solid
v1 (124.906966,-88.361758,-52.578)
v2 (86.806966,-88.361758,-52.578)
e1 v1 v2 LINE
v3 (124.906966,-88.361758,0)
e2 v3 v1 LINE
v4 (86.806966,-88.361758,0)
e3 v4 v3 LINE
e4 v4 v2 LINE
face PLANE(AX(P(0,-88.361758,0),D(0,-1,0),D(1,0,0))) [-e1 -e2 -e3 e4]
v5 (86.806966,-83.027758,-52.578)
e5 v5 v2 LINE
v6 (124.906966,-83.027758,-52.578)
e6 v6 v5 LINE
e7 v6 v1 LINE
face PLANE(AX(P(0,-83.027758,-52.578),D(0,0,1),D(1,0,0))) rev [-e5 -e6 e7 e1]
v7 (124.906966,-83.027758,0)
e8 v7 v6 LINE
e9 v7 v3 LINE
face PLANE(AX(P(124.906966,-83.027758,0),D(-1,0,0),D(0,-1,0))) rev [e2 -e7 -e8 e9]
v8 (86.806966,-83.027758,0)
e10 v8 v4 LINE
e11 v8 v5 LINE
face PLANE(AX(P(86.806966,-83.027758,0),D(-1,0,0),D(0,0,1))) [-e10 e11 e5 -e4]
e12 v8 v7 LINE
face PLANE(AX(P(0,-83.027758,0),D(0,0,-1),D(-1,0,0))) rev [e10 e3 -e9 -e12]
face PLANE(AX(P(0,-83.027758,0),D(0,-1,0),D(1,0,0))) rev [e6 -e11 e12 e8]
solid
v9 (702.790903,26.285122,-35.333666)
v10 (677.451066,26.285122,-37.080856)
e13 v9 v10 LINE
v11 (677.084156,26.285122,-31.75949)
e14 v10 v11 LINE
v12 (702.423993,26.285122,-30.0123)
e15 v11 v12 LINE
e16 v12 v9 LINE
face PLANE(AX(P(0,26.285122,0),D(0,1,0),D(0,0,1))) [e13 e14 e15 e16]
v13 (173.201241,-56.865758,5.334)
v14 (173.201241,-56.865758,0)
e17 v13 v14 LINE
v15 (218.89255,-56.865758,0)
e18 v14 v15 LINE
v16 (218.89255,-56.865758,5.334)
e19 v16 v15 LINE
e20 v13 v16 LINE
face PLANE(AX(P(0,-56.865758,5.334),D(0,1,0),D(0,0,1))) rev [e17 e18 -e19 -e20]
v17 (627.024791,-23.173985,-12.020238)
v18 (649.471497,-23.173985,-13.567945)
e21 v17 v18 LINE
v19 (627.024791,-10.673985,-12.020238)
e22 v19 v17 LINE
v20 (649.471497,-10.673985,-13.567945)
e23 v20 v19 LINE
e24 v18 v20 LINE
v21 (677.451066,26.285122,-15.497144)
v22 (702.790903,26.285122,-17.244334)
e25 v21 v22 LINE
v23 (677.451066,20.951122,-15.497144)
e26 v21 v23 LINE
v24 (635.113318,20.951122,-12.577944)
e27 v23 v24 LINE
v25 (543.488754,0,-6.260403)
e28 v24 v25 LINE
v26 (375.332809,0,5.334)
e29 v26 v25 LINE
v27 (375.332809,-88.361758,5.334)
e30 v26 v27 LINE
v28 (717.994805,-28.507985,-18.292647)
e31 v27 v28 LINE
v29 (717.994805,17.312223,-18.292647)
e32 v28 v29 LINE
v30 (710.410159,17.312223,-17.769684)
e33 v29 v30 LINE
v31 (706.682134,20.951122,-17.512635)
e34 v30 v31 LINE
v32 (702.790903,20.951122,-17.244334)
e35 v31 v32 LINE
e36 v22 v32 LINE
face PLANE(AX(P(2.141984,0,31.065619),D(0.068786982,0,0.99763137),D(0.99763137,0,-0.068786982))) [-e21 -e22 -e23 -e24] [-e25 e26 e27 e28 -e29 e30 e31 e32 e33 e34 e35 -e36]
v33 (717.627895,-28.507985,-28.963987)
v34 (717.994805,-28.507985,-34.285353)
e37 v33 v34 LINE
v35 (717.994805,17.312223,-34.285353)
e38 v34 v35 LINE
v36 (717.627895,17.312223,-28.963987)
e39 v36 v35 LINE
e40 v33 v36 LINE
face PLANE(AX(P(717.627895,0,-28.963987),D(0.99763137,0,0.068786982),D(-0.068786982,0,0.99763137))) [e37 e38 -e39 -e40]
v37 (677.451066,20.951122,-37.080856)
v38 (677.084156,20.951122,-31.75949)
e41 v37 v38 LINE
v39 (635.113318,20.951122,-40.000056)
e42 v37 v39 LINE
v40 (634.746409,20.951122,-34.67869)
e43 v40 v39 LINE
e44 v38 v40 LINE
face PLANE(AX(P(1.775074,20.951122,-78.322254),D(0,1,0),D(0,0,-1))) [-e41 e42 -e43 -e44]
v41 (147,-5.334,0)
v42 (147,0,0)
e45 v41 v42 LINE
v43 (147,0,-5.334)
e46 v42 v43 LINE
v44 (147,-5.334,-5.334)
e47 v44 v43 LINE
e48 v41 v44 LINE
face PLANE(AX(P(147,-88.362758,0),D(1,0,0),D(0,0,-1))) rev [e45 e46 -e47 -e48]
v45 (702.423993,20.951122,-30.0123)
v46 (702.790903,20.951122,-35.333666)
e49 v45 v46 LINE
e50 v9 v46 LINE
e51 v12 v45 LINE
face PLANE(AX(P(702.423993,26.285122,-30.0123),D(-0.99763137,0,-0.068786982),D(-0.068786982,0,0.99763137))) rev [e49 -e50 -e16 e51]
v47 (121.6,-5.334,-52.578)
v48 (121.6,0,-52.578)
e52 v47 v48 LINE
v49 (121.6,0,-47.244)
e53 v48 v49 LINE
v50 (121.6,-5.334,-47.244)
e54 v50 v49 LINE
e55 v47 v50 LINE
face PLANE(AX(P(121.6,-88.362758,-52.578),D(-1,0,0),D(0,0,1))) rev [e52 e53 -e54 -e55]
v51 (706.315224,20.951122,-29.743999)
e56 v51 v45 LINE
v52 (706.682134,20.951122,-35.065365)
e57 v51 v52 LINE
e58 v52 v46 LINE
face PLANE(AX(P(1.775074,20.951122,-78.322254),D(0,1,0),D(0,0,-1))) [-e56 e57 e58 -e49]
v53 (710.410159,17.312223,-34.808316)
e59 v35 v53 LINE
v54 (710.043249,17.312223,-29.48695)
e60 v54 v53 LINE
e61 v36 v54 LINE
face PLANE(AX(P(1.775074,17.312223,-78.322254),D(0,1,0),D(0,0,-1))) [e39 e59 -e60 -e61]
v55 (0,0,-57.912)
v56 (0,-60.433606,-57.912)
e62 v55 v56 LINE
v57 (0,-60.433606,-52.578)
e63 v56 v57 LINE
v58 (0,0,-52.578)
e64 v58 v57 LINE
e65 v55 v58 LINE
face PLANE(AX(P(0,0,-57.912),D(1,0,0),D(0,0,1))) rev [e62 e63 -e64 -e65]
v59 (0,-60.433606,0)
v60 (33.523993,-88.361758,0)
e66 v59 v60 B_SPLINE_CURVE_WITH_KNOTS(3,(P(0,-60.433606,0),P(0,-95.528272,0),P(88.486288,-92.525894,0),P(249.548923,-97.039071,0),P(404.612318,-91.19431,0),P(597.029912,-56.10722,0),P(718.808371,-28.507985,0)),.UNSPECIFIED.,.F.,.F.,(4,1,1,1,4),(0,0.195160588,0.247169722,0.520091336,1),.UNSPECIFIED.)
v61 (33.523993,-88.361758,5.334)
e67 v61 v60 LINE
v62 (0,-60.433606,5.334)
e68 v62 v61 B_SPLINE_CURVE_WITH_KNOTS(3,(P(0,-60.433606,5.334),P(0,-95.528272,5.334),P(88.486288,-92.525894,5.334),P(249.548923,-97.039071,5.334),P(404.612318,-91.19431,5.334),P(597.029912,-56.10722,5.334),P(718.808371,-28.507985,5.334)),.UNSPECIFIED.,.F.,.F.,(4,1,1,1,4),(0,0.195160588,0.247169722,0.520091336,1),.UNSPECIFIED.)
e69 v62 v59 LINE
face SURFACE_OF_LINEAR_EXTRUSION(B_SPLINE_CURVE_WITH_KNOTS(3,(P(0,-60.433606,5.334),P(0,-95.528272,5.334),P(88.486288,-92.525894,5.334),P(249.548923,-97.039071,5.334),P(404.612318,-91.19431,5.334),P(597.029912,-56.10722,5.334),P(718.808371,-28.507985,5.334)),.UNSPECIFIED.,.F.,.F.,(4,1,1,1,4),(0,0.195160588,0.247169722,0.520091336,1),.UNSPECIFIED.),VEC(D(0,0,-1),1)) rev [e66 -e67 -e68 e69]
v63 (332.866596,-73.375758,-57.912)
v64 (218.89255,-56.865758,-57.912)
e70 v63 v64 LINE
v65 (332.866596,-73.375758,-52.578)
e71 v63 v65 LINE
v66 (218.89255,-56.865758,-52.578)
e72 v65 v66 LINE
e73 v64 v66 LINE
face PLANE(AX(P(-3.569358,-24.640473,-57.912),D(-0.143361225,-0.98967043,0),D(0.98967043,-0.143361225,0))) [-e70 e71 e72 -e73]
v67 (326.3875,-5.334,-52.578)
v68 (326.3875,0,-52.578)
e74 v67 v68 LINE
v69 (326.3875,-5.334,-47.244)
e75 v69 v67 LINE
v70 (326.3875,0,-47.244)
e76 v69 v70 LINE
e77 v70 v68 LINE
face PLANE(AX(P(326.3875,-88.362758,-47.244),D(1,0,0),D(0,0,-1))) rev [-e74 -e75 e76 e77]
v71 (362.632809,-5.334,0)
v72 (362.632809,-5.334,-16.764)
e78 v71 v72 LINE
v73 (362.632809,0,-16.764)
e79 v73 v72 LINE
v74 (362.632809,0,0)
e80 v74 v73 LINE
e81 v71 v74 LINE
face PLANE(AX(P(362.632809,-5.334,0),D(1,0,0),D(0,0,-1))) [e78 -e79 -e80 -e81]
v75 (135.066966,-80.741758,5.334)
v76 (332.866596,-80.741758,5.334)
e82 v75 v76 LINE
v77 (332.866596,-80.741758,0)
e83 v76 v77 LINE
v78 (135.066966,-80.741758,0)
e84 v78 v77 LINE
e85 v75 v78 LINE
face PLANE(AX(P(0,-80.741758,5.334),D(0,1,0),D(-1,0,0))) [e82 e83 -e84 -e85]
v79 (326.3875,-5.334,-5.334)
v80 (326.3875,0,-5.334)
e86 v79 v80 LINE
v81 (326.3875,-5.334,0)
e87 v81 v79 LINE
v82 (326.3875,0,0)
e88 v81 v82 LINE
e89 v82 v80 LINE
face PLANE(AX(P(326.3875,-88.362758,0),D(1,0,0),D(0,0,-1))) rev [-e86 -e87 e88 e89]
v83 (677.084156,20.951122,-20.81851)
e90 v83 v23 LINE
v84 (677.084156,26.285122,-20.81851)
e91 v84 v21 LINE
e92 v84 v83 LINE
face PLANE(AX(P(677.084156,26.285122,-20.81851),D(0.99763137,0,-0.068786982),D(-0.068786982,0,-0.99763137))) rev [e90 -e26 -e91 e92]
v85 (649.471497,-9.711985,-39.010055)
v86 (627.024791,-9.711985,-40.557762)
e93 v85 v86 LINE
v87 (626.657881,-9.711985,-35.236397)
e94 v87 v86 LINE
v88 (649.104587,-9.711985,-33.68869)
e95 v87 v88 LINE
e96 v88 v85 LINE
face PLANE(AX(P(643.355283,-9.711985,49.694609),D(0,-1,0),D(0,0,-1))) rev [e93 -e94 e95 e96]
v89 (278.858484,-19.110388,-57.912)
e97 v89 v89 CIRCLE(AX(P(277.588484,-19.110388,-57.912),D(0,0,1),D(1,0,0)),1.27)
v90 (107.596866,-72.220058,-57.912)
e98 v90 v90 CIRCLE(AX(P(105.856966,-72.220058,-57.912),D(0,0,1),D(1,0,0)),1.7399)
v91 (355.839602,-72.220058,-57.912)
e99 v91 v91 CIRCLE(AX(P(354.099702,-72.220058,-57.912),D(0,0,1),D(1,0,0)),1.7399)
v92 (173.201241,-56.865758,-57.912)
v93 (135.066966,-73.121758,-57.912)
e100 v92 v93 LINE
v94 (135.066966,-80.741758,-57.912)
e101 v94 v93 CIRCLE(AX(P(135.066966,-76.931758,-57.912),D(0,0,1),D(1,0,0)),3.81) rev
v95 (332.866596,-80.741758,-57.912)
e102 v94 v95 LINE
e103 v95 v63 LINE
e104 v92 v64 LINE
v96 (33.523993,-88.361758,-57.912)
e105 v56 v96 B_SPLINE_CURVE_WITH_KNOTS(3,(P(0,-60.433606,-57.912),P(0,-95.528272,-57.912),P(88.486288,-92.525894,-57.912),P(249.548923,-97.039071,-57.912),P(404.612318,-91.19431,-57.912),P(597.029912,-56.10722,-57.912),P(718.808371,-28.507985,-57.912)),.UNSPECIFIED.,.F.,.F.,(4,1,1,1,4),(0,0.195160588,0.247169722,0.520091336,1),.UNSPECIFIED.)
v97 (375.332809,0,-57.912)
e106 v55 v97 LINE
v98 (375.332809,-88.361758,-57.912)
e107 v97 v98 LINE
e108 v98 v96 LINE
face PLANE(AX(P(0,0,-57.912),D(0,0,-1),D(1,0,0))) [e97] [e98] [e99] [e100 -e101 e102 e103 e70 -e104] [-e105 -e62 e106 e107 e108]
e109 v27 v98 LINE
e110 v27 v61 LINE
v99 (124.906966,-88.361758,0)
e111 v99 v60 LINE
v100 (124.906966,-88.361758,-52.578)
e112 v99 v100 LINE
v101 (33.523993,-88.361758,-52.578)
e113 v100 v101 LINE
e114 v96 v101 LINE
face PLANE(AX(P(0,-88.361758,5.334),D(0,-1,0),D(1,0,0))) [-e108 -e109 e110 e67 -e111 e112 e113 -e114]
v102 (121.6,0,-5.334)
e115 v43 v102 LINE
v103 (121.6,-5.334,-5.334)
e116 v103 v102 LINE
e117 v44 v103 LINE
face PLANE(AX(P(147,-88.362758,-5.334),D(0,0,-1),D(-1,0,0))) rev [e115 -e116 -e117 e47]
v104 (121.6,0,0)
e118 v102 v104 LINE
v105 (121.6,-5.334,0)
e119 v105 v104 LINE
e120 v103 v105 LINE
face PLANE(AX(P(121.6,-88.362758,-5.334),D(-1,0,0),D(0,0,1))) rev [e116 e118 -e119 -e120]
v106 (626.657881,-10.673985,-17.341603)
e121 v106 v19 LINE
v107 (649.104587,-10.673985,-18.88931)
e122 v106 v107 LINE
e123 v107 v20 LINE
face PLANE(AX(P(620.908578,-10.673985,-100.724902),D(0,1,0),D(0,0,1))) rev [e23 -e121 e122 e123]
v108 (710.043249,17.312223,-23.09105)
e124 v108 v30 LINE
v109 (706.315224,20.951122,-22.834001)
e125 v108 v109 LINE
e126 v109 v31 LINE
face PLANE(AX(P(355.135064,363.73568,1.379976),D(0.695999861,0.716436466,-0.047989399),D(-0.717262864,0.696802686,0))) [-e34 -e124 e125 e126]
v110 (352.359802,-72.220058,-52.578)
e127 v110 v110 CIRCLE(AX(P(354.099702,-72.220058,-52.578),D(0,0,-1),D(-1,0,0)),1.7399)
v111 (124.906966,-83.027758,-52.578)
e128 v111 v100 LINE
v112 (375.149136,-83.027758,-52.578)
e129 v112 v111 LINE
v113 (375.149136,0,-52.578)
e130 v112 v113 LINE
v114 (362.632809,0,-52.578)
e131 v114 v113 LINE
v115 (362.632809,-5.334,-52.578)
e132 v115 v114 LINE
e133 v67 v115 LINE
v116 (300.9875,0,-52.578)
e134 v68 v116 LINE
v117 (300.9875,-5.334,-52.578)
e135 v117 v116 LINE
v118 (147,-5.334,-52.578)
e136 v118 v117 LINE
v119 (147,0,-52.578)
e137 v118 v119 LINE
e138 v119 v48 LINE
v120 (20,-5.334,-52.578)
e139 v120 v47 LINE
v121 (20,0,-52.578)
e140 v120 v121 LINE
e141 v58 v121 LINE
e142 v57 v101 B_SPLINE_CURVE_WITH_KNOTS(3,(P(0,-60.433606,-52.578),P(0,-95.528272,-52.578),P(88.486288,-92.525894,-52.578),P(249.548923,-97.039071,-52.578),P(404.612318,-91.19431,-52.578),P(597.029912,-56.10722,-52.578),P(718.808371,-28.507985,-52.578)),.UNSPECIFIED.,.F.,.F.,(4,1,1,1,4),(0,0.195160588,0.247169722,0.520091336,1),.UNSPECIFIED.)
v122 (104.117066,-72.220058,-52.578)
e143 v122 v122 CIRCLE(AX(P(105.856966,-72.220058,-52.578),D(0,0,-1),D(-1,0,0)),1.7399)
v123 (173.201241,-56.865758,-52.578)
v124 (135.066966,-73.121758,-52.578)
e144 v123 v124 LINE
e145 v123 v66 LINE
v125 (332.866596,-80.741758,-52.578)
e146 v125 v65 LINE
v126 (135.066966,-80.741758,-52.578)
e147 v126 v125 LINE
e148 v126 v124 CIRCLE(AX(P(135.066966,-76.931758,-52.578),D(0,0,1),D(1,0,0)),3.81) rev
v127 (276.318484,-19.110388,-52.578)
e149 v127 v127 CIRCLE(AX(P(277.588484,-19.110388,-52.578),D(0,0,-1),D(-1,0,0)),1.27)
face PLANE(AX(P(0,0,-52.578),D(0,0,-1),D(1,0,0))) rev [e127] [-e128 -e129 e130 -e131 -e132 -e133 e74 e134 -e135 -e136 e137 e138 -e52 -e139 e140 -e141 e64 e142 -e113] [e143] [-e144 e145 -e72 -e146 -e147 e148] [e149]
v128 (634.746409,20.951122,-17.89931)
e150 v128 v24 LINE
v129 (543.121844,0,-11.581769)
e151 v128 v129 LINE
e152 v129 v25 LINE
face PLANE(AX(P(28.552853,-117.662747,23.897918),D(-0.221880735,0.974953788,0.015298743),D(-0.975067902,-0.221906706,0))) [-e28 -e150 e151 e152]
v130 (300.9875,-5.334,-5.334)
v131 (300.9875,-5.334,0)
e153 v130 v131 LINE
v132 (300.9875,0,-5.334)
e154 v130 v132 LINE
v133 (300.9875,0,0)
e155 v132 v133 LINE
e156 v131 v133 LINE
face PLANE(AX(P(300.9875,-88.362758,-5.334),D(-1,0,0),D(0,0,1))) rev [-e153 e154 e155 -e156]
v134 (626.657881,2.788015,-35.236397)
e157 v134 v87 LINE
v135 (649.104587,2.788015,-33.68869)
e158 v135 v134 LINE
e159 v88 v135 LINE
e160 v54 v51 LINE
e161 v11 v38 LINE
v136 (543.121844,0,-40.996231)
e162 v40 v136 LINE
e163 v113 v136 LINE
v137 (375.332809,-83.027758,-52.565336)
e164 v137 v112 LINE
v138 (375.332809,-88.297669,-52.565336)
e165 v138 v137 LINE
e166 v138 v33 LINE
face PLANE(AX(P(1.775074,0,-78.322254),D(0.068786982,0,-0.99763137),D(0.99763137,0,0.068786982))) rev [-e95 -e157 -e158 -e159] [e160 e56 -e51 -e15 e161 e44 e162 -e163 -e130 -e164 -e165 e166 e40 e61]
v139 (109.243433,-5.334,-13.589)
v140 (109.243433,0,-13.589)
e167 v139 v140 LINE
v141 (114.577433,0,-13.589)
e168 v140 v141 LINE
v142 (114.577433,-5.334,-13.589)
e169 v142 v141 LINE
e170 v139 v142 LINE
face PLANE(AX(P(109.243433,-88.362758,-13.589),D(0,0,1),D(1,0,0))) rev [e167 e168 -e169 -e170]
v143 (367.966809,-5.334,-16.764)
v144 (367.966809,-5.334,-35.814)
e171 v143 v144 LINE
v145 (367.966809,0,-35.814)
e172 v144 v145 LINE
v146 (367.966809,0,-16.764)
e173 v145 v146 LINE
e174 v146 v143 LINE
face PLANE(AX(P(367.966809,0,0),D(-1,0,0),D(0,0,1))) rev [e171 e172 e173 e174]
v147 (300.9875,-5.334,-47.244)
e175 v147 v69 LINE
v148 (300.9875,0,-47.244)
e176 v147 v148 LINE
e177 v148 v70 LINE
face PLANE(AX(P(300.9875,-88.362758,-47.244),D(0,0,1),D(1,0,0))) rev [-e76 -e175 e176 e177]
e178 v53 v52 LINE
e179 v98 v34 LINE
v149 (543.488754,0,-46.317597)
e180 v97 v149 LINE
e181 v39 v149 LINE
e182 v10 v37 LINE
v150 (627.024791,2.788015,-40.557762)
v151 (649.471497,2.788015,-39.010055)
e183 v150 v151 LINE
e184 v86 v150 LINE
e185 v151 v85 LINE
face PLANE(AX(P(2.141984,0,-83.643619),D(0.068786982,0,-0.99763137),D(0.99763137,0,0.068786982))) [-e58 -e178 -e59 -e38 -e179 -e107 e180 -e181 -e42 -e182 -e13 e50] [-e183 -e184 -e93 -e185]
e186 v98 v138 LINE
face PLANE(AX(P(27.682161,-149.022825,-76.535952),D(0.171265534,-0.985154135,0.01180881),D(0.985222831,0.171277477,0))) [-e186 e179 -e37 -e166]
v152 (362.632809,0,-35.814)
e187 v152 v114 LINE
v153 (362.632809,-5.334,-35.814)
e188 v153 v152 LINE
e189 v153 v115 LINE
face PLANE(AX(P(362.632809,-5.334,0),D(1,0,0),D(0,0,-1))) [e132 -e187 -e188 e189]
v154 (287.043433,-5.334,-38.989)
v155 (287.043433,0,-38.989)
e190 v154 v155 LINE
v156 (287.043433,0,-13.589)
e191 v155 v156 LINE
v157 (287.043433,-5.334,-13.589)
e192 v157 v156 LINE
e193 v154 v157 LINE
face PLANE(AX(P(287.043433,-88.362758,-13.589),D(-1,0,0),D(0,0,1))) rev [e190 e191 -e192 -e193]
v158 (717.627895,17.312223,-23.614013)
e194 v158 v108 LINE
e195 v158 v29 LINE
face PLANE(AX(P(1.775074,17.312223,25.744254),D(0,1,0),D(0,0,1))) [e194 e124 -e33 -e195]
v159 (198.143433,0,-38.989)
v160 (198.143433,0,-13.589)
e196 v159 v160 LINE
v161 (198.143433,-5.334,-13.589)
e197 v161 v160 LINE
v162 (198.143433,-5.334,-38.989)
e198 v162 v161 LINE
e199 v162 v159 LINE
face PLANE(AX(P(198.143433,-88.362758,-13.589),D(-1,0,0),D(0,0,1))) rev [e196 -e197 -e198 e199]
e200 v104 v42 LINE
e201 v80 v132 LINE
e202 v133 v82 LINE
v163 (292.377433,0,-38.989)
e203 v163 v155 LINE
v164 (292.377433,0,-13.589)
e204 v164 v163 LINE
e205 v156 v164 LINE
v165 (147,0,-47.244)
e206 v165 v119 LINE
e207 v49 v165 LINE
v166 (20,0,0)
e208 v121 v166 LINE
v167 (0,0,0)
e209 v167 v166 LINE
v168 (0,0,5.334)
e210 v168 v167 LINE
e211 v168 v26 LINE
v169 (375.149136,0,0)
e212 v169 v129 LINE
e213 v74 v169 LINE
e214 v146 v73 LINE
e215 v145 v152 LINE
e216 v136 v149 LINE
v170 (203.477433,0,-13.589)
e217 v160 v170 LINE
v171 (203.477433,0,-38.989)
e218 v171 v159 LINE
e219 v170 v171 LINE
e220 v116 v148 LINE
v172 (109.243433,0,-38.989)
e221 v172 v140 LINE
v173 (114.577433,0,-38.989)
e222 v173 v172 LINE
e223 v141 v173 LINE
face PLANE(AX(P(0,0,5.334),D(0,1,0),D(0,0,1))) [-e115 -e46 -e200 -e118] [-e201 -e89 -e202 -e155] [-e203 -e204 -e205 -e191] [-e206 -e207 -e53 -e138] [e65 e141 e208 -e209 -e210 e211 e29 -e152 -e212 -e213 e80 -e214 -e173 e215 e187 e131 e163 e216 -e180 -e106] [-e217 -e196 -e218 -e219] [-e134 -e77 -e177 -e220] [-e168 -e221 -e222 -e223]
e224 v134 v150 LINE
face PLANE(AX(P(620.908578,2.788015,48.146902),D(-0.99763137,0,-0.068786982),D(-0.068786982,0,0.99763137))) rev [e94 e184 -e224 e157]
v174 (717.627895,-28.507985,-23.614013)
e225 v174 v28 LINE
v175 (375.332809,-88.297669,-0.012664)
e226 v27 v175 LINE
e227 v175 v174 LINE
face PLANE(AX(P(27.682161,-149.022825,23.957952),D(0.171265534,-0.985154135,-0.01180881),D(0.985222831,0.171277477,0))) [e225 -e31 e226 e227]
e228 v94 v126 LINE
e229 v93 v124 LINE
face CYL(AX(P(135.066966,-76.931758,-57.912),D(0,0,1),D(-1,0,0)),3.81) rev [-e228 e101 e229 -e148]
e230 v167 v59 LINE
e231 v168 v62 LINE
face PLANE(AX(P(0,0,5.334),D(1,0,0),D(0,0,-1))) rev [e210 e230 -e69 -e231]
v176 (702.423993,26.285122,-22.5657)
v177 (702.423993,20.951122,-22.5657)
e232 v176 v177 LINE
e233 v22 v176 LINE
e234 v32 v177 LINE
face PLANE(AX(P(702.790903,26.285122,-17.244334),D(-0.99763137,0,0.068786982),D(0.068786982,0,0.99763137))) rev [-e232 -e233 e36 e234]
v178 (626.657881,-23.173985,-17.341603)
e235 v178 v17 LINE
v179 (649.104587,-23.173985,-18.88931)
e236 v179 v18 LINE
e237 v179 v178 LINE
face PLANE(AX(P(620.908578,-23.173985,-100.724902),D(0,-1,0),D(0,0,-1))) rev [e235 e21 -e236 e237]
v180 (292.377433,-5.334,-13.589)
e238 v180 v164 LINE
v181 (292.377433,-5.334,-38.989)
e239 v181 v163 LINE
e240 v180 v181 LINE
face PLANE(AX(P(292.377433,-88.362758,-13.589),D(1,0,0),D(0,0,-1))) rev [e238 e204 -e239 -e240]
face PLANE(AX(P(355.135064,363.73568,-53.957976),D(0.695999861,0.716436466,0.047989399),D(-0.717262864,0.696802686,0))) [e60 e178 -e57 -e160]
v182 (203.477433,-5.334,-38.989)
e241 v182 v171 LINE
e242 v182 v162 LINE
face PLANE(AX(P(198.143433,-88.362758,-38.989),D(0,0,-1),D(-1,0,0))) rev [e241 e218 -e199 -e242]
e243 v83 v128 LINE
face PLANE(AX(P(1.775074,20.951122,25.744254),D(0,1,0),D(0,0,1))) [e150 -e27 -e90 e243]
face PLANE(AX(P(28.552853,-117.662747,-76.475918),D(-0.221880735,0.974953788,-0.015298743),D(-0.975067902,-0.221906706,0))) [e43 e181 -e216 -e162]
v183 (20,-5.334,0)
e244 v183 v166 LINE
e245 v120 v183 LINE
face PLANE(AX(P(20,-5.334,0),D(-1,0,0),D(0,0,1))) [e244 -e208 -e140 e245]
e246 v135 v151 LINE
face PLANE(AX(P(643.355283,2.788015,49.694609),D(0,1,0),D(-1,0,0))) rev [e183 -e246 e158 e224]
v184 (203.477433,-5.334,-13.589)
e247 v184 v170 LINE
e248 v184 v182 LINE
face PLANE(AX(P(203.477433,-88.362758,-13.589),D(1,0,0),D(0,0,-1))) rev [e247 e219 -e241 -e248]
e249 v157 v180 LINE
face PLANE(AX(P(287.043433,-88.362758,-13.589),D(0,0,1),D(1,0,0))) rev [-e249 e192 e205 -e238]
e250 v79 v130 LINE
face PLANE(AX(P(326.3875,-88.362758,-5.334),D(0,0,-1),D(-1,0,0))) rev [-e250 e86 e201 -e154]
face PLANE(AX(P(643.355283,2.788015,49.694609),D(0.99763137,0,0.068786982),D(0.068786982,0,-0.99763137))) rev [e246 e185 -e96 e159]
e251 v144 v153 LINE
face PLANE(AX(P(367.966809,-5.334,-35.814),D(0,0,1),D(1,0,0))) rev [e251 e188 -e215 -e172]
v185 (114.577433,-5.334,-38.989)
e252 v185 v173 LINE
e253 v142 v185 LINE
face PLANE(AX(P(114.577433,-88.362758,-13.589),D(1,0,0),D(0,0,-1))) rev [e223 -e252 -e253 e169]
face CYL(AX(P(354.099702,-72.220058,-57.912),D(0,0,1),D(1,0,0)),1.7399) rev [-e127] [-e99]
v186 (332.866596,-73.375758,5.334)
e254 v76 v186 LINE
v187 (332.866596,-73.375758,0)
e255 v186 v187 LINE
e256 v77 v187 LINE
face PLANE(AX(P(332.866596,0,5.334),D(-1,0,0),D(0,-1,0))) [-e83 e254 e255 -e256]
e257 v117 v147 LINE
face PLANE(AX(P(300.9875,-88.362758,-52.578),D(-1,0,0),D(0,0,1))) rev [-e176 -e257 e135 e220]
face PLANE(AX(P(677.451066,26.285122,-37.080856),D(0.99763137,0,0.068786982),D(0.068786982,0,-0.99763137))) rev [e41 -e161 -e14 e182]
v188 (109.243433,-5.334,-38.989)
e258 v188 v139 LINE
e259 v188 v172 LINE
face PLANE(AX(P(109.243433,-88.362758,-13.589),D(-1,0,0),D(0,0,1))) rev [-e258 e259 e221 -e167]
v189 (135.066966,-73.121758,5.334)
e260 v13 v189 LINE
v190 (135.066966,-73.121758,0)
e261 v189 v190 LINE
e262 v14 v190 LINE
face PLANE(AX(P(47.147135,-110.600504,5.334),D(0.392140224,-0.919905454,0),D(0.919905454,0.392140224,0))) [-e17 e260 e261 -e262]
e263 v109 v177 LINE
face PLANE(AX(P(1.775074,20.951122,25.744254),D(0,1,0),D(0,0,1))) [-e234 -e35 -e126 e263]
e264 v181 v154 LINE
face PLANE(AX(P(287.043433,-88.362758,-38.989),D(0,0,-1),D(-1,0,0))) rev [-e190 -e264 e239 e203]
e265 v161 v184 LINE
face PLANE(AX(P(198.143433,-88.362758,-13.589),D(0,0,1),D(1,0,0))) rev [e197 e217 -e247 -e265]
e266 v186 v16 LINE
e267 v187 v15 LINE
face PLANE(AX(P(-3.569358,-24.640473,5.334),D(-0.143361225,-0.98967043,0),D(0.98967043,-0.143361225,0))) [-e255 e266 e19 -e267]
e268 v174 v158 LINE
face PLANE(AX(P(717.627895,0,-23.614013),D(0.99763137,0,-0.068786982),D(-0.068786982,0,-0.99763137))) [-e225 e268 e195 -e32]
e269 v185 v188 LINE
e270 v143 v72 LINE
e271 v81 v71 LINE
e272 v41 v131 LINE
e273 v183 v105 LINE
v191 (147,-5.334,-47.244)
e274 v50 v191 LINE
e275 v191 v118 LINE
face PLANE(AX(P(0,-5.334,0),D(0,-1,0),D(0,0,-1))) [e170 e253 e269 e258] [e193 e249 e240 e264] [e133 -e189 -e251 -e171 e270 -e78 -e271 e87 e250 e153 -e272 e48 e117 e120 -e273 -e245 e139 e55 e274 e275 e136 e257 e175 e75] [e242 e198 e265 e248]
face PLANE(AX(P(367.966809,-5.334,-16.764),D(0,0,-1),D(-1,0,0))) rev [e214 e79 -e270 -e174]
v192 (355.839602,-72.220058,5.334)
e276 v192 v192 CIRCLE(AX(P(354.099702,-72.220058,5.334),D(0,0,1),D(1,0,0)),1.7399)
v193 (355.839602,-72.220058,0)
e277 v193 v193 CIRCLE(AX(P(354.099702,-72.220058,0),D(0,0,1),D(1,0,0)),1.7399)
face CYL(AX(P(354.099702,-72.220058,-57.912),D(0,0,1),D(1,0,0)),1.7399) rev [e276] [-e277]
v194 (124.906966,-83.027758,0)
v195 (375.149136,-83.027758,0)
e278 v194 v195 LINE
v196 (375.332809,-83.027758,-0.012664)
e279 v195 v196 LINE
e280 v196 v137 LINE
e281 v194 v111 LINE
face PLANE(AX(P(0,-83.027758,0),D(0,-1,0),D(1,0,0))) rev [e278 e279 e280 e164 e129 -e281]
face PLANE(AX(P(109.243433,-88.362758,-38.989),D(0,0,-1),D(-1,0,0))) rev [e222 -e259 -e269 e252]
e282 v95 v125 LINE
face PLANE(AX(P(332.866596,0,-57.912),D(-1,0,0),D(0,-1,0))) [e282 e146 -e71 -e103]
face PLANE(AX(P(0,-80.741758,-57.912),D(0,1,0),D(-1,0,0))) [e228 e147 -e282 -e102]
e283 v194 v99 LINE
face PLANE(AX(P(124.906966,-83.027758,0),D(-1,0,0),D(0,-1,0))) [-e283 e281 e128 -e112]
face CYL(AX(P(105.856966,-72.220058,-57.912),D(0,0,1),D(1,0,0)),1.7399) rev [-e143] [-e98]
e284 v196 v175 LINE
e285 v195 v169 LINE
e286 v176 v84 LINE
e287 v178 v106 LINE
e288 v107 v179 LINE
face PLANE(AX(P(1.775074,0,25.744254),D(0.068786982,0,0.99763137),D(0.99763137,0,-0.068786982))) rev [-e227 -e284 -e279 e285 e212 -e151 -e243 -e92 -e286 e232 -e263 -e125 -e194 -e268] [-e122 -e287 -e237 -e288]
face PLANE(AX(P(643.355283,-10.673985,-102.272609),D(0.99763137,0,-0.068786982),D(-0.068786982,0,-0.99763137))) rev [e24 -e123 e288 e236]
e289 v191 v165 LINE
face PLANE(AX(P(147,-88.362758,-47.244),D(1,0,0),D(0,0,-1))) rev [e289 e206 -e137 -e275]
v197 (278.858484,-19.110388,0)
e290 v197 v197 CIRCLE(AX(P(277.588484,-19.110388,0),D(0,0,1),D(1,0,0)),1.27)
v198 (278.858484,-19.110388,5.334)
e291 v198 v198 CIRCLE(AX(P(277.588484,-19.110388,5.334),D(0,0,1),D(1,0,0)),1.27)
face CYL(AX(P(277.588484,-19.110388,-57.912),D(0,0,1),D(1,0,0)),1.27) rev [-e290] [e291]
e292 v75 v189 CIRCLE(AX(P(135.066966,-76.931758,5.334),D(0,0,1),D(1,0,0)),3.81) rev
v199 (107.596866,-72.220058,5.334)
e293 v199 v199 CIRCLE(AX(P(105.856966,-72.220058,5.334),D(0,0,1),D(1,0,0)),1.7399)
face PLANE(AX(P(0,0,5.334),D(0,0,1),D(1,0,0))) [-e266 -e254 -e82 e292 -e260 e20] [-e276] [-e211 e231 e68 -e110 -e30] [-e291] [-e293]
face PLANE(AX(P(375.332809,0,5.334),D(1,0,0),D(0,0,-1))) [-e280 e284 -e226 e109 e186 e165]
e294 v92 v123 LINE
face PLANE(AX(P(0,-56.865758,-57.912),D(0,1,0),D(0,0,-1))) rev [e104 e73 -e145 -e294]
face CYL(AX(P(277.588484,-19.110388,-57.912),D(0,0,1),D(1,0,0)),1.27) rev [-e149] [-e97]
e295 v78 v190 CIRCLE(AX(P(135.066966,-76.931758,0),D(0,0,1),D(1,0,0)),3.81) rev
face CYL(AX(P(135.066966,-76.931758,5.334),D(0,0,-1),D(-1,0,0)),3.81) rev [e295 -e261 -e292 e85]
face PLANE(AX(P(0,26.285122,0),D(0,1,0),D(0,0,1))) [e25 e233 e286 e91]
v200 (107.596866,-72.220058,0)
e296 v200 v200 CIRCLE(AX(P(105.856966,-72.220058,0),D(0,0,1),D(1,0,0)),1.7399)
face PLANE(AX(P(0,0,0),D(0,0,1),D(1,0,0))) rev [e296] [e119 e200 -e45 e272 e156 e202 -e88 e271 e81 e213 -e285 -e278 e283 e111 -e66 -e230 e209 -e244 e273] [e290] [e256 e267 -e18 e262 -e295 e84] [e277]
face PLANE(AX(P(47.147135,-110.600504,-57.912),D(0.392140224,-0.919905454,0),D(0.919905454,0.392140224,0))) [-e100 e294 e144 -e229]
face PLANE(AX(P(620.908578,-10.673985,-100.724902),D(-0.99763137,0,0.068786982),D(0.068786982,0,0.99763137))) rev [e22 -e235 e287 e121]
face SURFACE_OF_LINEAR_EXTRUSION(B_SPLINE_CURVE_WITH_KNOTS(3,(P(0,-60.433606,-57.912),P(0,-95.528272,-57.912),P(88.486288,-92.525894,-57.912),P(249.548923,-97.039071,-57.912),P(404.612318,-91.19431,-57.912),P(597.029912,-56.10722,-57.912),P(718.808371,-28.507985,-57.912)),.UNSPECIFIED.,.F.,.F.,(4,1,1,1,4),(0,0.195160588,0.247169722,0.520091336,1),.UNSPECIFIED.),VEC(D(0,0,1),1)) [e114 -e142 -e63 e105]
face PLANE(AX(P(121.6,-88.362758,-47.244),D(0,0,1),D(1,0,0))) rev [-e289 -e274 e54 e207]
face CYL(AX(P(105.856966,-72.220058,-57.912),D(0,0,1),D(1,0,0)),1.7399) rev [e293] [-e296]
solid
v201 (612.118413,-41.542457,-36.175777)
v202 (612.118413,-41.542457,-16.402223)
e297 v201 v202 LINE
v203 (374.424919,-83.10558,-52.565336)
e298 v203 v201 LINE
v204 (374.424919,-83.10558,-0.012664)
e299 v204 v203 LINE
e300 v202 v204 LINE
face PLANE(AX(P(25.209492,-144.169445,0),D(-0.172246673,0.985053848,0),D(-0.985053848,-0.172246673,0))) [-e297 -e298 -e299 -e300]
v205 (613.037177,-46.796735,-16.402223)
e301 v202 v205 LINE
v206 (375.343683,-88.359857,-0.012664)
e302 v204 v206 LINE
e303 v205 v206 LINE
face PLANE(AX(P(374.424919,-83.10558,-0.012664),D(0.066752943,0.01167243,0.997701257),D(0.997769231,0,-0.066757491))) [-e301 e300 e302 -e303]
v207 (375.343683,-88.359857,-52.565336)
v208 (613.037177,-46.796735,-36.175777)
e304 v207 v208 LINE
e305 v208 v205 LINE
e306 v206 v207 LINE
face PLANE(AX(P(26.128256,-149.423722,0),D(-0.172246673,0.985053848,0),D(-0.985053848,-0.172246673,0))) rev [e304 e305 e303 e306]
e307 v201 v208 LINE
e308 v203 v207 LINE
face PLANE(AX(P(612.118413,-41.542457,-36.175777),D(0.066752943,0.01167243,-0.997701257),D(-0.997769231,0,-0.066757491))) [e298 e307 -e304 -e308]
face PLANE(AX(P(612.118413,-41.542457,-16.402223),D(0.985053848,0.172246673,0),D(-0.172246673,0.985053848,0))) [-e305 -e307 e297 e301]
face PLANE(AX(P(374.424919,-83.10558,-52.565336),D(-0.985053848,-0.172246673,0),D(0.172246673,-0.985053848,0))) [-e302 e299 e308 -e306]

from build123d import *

# Parameters (mm, degrees)
BOSS_EXTRUDE1_DEPTH                    = 5.334
SKETCH3_W                              = 342.632808843
SKETCH3_H                              = 26.289
BOSS_EXTRUDE2_DEPTH                    = 5.334
BOSS_EXTRUDE5_START                    = -5.334
BOSS_EXTRUDE5_DEPTH                    = 5.334
POWER_POD_SLOTS_REACH                  = 727.726
SKETCH13_W                             = 25.4
SKETCH13_H                             = 5.334
ELEVATOR_TABS_DEPTH                    = 5.334
SKETCH19_W                             = 19.05
SKETCH19_H                             = 5.334
FORMER_TAB_DEPTH                       = 5.334
RUDDER_SERVO_SLOT_REACH                = 728.753
SKETCH16_W                             = 22.5
SKETCH16_H                             = 12.5
ELEVATOR_SERVO_SLOT_REACH              = 725.169
SKETCH17_W                             = 22.5
SKETCH17_H                             = 12.5
FORMER_SLOTS_REACH                     = 727.726
SKETCH26_W                             = 5.334
SKETCH26_H                             = 25.4
SKETCH21_W                             = 250.425843048
SKETCH21_H                             = 52.578
UNDERBELLY_DEPTH                       = 5.334
SKETCH21_6_W                           = 38.1
SKETCH21_6_H                           = 52.578
REMOVABLE_WING_SUPPORT_DEPTH           = 5.334
ANGLED_UNDERBELLY_DEPTH                = 5.334
SKETCH28_R                             = 1.7399
F_15_CRUSH_REMOVABLE_WING_MOUNTS_DEPTH = 727.171052045
SKETCH30_R                             = 1.27
BBQ_SKEWER_HOLES_DEPTH                 = 727.171052045


# Read off the part's stored shape, not the designer's step: Boss-Extrude5
with BuildPart() as part:
    # Sketch2 → Boss-Extrude1 (new body)
    with BuildSketch(Plane.XY):
        with BuildLine():
            Line((375.332808843, 0), (0, 0))
            Line((0, 0), (0, -60.43360552))
            add(Edge.make_bspline(
                [(0, -60.43360552), (0, -75.756990751), (13.319871138, -83.937776911), (33.52399345, -88.361758411)],
                knots=[0, 0, 0, 0, 0.085212973, 0.085212973, 0.085212973, 0.085212973], degree=3))
            Line((33.52399345, -88.361758411), (375.332808843, -88.361758411))
            Line((375.332808843, -88.361758411), (375.332808843, 0))
        make_face()
        with BuildLine():
            Line((173.201240555, -80.741758411), (135.066965795, -80.741758411))
            ThreePointArc((135.066965795, -80.741758411), (131.256965795, -76.931758411), (135.066965795, -73.121758411))
            Line((135.066965795, -73.121758411), (173.201240555, -56.865758411))
            Line((173.201240555, -56.865758411), (218.892549783, -56.865758411))
            Line((218.892549783, -56.865758411), (332.866595595, -73.375758411))
            Line((332.866595595, -73.375758411), (332.866595595, -80.741758411))
            Line((332.866595595, -80.741758411), (218.892549783, -80.741758411))
            Line((218.892549783, -80.741758411), (173.201240555, -80.741758411))
        make_face(mode=Mode.SUBTRACT)
    boss_extrude1 = extrude(amount=BOSS_EXTRUDE1_DEPTH)

    # Sketch3 → Boss-Extrude2 (add)
    with BuildSketch(Plane(origin=(0, 0, 0), x_dir=(1, 0, 0), z_dir=(0, 1, 0))):
        with Locations((191.316404422, 13.1445)):
            Rectangle(SKETCH3_W, SKETCH3_H)
    boss_extrude2 = extrude(amount=-BOSS_EXTRUDE2_DEPTH)

    # Boss-Extrude5 outline → Boss-Extrude5 (add)
    with BuildSketch(Plane(origin=(2.141983772, 0, 31.065619336), x_dir=(0.9976313703333219, 0, -0.0687869822485207), z_dir=(0.0687869822485207, 0, 0.9976313703333219)).offset(BOSS_EXTRUDE5_START)):
        Polygon((717.552437166, -28.507984923), (717.552437166, 17.312222731), (709.949782932, 17.312222731), (706.212906654, 20.95112249), (634.474168953, 20.95112249), (542.63206433, 0), (374.076874654, 0), (374.076874654, -88.361758411), align=None)
    boss_extrude5 = extrude(amount=BOSS_EXTRUDE5_DEPTH)

    # Mirror4: Boss-Extrude1, Boss-Extrude2, Boss-Extrude5 across plane
    add(boss_extrude1.mirror(Plane(origin=(20, -5.334, -26.289), x_dir=(1, 0, 0), z_dir=(0, 0, -1))))
    add(boss_extrude2.mirror(Plane(origin=(20, -5.334, -26.289), x_dir=(1, 0, 0), z_dir=(0, 0, -1))))
    add(boss_extrude5.mirror(Plane(origin=(20, -5.334, -26.289), x_dir=(1, 0, 0), z_dir=(0, 0, -1))))

    # Sketch13 → Power Pod Slots (cut, up to next)
    with BuildSketch(Plane(origin=(0, 0, 0), x_dir=(1, 0, 0), z_dir=(0, 1, 0)), mode=Mode.PRIVATE) as power_pod_slots_sk1:
        with Locations((313.6875, 49.911)):
            Rectangle(SKETCH13_W, SKETCH13_H)
    power_pod_slots_tool1 = extrude(power_pod_slots_sk1.sketch, amount=-POWER_POD_SLOTS_REACH, mode=Mode.PRIVATE) & part.part
    # Sketch13 → Power Pod Slots (cut, up to next)
    with BuildSketch(Plane(origin=(0, 0, 0), x_dir=(1, 0, 0), z_dir=(0, 1, 0)), mode=Mode.PRIVATE) as power_pod_slots_sk2:
        with Locations((313.6875, 2.667)):
            Rectangle(SKETCH13_W, SKETCH13_H)
    power_pod_slots_tool2 = extrude(power_pod_slots_sk2.sketch, amount=-POWER_POD_SLOTS_REACH, mode=Mode.PRIVATE) & part.part
    # Sketch13 → Power Pod Slots (cut, up to next)
    with BuildSketch(Plane(origin=(0, 0, 0), x_dir=(1, 0, 0), z_dir=(0, 1, 0)), mode=Mode.PRIVATE) as power_pod_slots_sk3:
        with Locations((134.3, 2.667)):
            Rectangle(SKETCH13_W, SKETCH13_H)
    power_pod_slots_tool3 = extrude(power_pod_slots_sk3.sketch, amount=-POWER_POD_SLOTS_REACH, mode=Mode.PRIVATE) & part.part
    # Sketch13 → Power Pod Slots (cut, up to next)
    with BuildSketch(Plane(origin=(0, 0, 0), x_dir=(1, 0, 0), z_dir=(0, 1, 0)), mode=Mode.PRIVATE) as power_pod_slots_sk4:
        with Locations((134.3, 49.911)):
            Rectangle(SKETCH13_W, SKETCH13_H)
    power_pod_slots_tool4 = extrude(power_pod_slots_sk4.sketch, amount=-POWER_POD_SLOTS_REACH, mode=Mode.PRIVATE) & part.part
    add(power_pod_slots_tool1.solids().sort_by_distance((313.6875, 0, -49.911))[0], mode=Mode.SUBTRACT)
    add(power_pod_slots_tool2.solids().sort_by_distance((313.6875, 0, -2.667))[0], mode=Mode.SUBTRACT)
    add(power_pod_slots_tool3.solids().sort_by_distance((134.3, 0, -2.667))[0], mode=Mode.SUBTRACT)
    add(power_pod_slots_tool4.solids().sort_by_distance((134.3, 0, -49.911))[0], mode=Mode.SUBTRACT)

    # Sketch14 → Elevator Tabs (add)
    with BuildSketch(Plane(origin=(0, 20.95112249, 0), x_dir=(1, 0, 0), z_dir=(0, 1, 0))):
        Polygon((702.790902865, 35.333666188), (677.451066058, 37.080855537), (677.084156295, 31.759489808), (702.423993101, 30.012300459), align=None)
        Polygon((702.790902865, 17.244333812), (702.423993101, 22.565699541), (677.084156295, 20.818510192), (677.451066058, 15.497144463), align=None)
    extrude(amount=ELEVATOR_TABS_DEPTH)

    # Sketch19 → Former Tab (add)
    with BuildSketch(Plane(origin=(362.632808843, 0, 0), x_dir=(0, 0, -1), z_dir=(1, 0, 0))):
        with Locations((26.289, -2.667)):
            Rectangle(SKETCH19_W, SKETCH19_H)
    extrude(amount=FORMER_TAB_DEPTH)

    # Sketch16 → Rudder Servo Slot (cut, up to next)
    with BuildSketch(Plane(origin=(2.141983772, 0, 31.065619336), x_dir=(0.9976313703333219, 0, -0.06878698224852071), z_dir=(0.06878698224852071, 0, 0.997631370333322)), mode=Mode.PRIVATE) as rudder_servo_slot_sk1:
        with Locations((637.616437166, -16.923984923)):
            Rectangle(SKETCH16_W, SKETCH16_H)
    rudder_servo_slot_tool1 = extrude(rudder_servo_slot_sk1.sketch, amount=-RUDDER_SERVO_SLOT_REACH, mode=Mode.PRIVATE) & part.part
    add(rudder_servo_slot_tool1.solids().sort_by_distance((638.248144, -16.923985, -12.794091))[0], mode=Mode.SUBTRACT)

    # Sketch17 → Elevator Servo Slot (cut, up to next)
    with BuildSketch(Plane(origin=(5.750099145, 0, -83.394838699), x_dir=(-0.9976313703333219, 0, -0.06878698224852071), z_dir=(0.06878698224852071, 0, -0.997631370333322)), mode=Mode.PRIVATE) as elevator_servo_slot_sk1:
        with Locations((-633.999755214, -3.461984923)):
            Rectangle(SKETCH17_W, SKETCH17_H)
    elevator_servo_slot_tool1 = extrude(elevator_servo_slot_sk1.sketch, amount=-ELEVATOR_SERVO_SLOT_REACH, mode=Mode.PRIVATE) & part.part
    add(elevator_servo_slot_tool1.solids().sort_by_distance((638.248144, -3.461985, -39.783909))[0], mode=Mode.SUBTRACT)

    # Sketch26 → Former Slots (cut, up to next)
    with BuildSketch(Plane(origin=(0, 0, 0), x_dir=(1, 0, 0), z_dir=(0, 1, 0)), mode=Mode.PRIVATE) as former_slots_sk1:
        with Locations((200.810432831, 26.289)):
            Rectangle(SKETCH26_W, SKETCH26_H)
    former_slots_tool1 = extrude(former_slots_sk1.sketch, amount=-FORMER_SLOTS_REACH, mode=Mode.PRIVATE) & part.part
    # Sketch26 → Former Slots (cut, up to next)
    with BuildSketch(Plane(origin=(0, 0, 0), x_dir=(1, 0, 0), z_dir=(0, 1, 0)), mode=Mode.PRIVATE) as former_slots_sk2:
        with Locations((111.910432831, 26.289)):
            Rectangle(SKETCH26_W, SKETCH26_H)
    former_slots_tool2 = extrude(former_slots_sk2.sketch, amount=-FORMER_SLOTS_REACH, mode=Mode.PRIVATE) & part.part
    # Sketch26 → Former Slots (cut, up to next)
    with BuildSketch(Plane(origin=(0, 0, 0), x_dir=(1, 0, 0), z_dir=(0, 1, 0)), mode=Mode.PRIVATE) as former_slots_sk3:
        with Locations((289.710432831, 26.289)):
            Rectangle(SKETCH26_W, SKETCH26_H)
    former_slots_tool3 = extrude(former_slots_sk3.sketch, amount=-FORMER_SLOTS_REACH, mode=Mode.PRIVATE) & part.part
    add(former_slots_tool1.solids().sort_by_distance((200.810433, 0, -26.289))[0], mode=Mode.SUBTRACT)
    add(former_slots_tool2.solids().sort_by_distance((111.910433, 0, -26.289))[0], mode=Mode.SUBTRACT)
    add(former_slots_tool3.solids().sort_by_distance((289.710433, 0, -26.289))[0], mode=Mode.SUBTRACT)

    # Sketch21 → Underbelly (add)
    with BuildSketch(Plane.XZ.offset(88.361758411)):
        with Locations((250.119887319, -26.289)):
            Rectangle(SKETCH21_W, SKETCH21_H)
    extrude(amount=-UNDERBELLY_DEPTH)

    # Sketch28 → 15% Crush Removable Wing Mounts (cut, through all)
    with BuildSketch(Plane.XY.offset(5.334)):
        with Locations((354.099702219, -72.220058411)):
            Circle(SKETCH28_R)
        with Locations((105.856965795, -72.220058411)):
            Circle(SKETCH28_R)
    extrude(amount=-F_15_CRUSH_REMOVABLE_WING_MOUNTS_DEPTH, mode=Mode.SUBTRACT)

    # Sketch30 → BBQ Skewer Holes (cut, through all)
    with BuildSketch(Plane.XY.offset(5.334)):
        with Locations((277.588484301, -19.110387516)):
            Circle(SKETCH30_R)
    extrude(amount=-BBQ_SKEWER_HOLES_DEPTH, mode=Mode.SUBTRACT)


with BuildPart() as body_2:
    # Sketch21<6> → Removable Wing Support (new body)
    with BuildSketch(Plane.XZ.offset(88.361758411)):
        with Locations((105.856965795, -26.289)):
            Rectangle(SKETCH21_6_W, SKETCH21_6_H)
    extrude(amount=-REMOVABLE_WING_SUPPORT_DEPTH)


with BuildPart() as body_3:
    # Sketch25 → Angled Underbelly (new body)
    with BuildSketch(Plane(origin=(26.128255959, -149.423722322, 0), x_dir=(-0.985053848047073, -0.17224667325569476, 0), z_dir=(0.17224667325569476, -0.985053848047073, 0))):
        Polygon((-354.514047872, 52.565335732), (-354.514047872, 0.012664268), (-595.814047872, 16.402222618), (-595.814047872, 36.175777382), align=None)
    extrude(amount=-ANGLED_UNDERBELLY_DEPTH)


solid = Compound([part.part, body_2.part, body_3.part])
